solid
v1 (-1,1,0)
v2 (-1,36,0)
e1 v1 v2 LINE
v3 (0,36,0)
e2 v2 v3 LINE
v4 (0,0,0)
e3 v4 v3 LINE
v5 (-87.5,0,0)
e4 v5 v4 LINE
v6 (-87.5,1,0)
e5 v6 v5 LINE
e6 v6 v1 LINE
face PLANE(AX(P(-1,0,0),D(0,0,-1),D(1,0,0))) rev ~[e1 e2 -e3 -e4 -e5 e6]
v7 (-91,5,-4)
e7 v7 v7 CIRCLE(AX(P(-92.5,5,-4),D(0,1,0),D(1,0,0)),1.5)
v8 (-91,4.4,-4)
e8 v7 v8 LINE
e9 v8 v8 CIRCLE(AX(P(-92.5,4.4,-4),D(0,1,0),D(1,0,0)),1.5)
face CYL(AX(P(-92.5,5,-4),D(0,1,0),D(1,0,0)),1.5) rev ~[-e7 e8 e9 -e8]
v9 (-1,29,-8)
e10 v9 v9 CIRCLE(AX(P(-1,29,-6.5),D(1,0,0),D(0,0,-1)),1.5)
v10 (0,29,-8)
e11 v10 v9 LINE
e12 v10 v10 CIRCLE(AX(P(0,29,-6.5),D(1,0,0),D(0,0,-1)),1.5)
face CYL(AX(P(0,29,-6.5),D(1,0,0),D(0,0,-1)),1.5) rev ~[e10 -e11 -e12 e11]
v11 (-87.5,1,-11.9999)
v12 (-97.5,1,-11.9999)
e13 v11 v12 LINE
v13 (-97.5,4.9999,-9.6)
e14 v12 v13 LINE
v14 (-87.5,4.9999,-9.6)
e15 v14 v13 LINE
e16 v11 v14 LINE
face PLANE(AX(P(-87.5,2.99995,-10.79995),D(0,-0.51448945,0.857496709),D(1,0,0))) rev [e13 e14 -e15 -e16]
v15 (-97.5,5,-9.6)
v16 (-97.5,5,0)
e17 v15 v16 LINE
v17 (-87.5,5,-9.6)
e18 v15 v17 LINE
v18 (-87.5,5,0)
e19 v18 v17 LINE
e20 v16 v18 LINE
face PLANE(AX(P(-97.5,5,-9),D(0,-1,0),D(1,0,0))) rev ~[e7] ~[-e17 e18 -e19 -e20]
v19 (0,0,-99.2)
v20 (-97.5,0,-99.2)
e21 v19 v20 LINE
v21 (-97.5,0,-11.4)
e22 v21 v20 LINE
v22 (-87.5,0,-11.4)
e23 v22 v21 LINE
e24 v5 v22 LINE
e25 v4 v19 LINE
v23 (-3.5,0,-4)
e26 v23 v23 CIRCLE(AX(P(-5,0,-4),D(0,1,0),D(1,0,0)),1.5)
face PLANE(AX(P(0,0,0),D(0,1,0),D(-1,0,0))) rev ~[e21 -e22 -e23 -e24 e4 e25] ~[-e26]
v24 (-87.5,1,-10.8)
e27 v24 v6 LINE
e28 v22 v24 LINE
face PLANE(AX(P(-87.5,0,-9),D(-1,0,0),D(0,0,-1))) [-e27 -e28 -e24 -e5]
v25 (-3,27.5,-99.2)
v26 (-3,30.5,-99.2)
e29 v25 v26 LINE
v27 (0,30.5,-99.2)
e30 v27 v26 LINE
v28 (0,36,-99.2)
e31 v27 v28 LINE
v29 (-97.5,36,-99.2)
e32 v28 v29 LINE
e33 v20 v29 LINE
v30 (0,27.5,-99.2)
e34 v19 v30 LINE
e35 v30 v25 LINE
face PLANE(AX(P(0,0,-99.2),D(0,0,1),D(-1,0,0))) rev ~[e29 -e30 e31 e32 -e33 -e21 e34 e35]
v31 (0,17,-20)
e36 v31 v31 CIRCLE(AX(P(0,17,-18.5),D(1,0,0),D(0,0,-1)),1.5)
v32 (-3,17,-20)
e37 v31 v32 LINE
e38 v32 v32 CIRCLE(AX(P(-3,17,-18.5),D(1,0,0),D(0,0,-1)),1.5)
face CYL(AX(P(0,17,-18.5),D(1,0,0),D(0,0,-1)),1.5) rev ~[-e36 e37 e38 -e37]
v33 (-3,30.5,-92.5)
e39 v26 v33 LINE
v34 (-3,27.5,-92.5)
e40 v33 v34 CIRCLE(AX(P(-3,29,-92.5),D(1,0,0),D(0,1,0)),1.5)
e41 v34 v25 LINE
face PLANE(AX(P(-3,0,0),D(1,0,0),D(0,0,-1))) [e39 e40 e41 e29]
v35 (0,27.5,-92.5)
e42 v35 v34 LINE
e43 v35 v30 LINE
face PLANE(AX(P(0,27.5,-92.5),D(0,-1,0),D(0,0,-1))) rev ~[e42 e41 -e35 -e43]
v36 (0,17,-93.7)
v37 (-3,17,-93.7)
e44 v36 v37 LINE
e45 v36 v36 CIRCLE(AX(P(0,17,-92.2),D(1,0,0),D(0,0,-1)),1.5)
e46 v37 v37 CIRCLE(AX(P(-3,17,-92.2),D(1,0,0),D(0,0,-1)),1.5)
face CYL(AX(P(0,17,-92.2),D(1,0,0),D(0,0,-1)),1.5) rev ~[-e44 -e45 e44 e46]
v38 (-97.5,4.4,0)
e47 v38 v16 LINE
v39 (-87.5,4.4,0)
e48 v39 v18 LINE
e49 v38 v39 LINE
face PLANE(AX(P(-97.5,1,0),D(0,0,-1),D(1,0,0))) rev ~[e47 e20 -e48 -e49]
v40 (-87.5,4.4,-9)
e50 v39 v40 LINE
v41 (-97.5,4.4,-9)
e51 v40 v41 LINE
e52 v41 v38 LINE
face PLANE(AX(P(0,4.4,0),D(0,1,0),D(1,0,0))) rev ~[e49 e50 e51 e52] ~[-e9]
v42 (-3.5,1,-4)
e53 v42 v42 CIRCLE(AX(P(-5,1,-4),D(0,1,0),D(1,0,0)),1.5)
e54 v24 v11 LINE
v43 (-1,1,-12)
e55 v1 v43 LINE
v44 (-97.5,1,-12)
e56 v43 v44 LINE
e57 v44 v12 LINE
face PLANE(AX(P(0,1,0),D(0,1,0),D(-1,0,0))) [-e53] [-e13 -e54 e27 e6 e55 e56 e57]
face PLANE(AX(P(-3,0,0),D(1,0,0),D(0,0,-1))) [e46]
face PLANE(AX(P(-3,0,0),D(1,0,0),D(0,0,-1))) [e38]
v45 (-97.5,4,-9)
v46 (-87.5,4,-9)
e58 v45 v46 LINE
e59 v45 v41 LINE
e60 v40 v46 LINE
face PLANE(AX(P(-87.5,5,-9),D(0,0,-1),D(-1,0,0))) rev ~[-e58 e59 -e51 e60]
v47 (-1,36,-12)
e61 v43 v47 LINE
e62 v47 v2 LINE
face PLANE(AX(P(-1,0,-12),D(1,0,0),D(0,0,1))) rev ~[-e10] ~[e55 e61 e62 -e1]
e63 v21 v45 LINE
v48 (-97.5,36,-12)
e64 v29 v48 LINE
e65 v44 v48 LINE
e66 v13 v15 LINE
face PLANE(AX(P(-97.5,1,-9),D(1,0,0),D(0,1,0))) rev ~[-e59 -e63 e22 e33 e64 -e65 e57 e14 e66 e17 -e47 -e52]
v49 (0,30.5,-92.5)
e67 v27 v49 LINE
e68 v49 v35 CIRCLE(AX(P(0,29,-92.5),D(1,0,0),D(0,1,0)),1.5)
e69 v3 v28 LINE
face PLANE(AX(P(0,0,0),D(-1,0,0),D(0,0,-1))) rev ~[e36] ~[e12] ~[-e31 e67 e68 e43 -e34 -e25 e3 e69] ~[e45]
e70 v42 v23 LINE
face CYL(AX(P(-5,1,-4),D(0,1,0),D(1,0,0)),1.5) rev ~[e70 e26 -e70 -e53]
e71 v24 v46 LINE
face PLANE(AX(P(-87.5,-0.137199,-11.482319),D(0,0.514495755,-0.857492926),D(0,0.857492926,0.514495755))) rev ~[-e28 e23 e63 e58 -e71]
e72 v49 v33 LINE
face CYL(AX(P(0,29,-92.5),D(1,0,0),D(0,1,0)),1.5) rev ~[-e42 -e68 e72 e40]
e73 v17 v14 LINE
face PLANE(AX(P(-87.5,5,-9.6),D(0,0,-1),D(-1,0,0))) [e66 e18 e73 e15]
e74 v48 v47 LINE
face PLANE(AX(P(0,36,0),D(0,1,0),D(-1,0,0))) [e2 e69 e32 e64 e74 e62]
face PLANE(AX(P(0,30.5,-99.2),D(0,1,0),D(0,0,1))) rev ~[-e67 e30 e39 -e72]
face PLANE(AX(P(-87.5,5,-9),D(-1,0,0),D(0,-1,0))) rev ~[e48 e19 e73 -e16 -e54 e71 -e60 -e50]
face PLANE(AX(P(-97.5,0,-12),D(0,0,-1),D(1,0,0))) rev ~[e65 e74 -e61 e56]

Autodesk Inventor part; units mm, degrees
ref_plane "YZ Plane" through (0, 0, 0) normal (1, 0, 0) x (0, 1, 0)
ref_plane "XZ Plane" through (0, 0, 0) normal (0, 1, 0) x (-1, 0, 0)
ref_plane "XY Plane" through (0, 0, 0) normal (0, 0, 1) x (1, 0, 0)
sketch "스케치1" plane through (0, 0, 0) normal (0, 1, 0) x (-1, 0, 0)
  line L0 (0, 0) -> (97.5, 0)
  line L1 (97.5, 0) -> (97.5, -99.2)
  line L2 (97.5, -99.2) -> (0, -99.2)
  line L3 (0, -99.2) -> (0, 0)
  line L4 (97.5, 0) -> (1, 0)
  line L5 (1, 0) -> (1, -12)
  line L6 (1, -12) -> (97.5, -12)
  line L7 (97.5, -12) -> (97.5, 0)
  point P0 (1, -6)
  point P1 (97.5, -6)
  point P2 (48.75, 0)
  dimension "d0" = 97.5
  dimension "d1" = 99.2
  dimension "d2" = 96.5
  dimension "d3" = 12
  dimension "d6" = 1
sketch "스케치1 outline for 돌출1" plane through (0, 0, 0) normal (0, 1, 0) x (-1, 0, 0)
  line L0 (0, 0) -> (0, -99.2)
  line L1 (1, 0) -> (0, 0)
  line L2 (1, -12) -> (1, 0)
  line L3 (97.5, -12) -> (1, -12)
  line L4 (97.5, -99.2) -> (97.5, -12)
  line L5 (0, -99.2) -> (97.5, -99.2)
extrude "돌출1" add sketch "스케치1 outline for 돌출1" along normal blind 36
sketch "스케치1 outline for 돌출2" plane through (0, 0, 0) normal (0, 1, 0) x (-1, 0, 0)
  line L0 (1, -12) -> (97.5, -12)
  line L1 (1, 0) -> (1, -12)
  line L2 (97.5, 0) -> (1, 0)
  line L3 (97.5, -12) -> (97.5, 0)
extrude "돌출2" add sketch "스케치1 outline for 돌출2" along normal blind 1
sketch "스케치2" plane through (0, 1, 0) normal (0, 1, 0) x (1, 0, 0)
  circle A0 centre (-5, 4) radius 1.5
  line L0 (0, 0) -> (0, 99.2) projected
  line L1 (-97.5, 0) -> (-1, 0) projected
  line L2 (-97.5, 0) -> (0, 0) projected
  line L3 (-97.5, 0) -> (-87.5, 0)
  line L4 (-87.5, 0) -> (-87.5, 9)
  line L5 (-87.5, 9) -> (-97.5, 9)
  line L6 (-97.5, 9) -> (-97.5, 0)
  dimension "d11" = 3
  dimension "d13" = 5
  dimension "d14" = 4
  dimension "d15" = 10
  dimension "d16" = 9
sketch "스케치2 outline for 돌출3" plane through (0, 1, 0) normal (0, 1, 0) x (1, 0, 0)
  line L0 (-97.5, 9) -> (-97.5, 0)
  line L1 (-87.5, 9) -> (-97.5, 9)
  line L2 (-87.5, 0) -> (-87.5, 9)
  line L3 (-97.5, 0) -> (-87.5, 0)
extrude "돌출3" cut sketch "스케치2 outline for 돌출3" against normal blind 1
sketch "스케치2 outline for 돌출4" plane through (0, 1, 0) normal (0, 1, 0) x (1, 0, 0)
  line L0 (-97.5, 9) -> (-97.5, 0)
  line L1 (-87.5, 9) -> (-97.5, 9)
  line L2 (-87.5, 0) -> (-87.5, 9)
  line L3 (-97.5, 0) -> (-87.5, 0)
extrude "돌출4" add sketch "스케치2 outline for 돌출4" along normal blind 4
sketch "스케치2 outline for 돌출5" plane through (0, 1, 0) normal (0, 1, 0) x (1, 0, 0)
  line L0 (-97.5, 9) -> (-97.5, 0)
  line L1 (-87.5, 9) -> (-97.5, 9)
  line L2 (-87.5, 0) -> (-87.5, 9)
  line L3 (-97.5, 0) -> (-87.5, 0)
extrude "돌출5" cut sketch "스케치2 outline for 돌출5" along normal blind 3.4
sketch "스케치3" plane through (-87.5, 5, -9) normal (0, 0, -1) x (-1, 0, 0)
  line L0 (0, 0) -> (10, 0)
  line L1 (10, 0) -> (10, -4)
  line L2 (10, -4) -> (0, -4)
  line L3 (0, -4) -> (0, 0)
  point P0 (-87.5, -5)
  point P1 (0, -0.6)
sketch "스케치3 outline for 돌출6" plane through (-87.5, 5, -9) normal (0, 0, -1) x (-1, 0, 0)
  line L0 (0, 0) -> (0, -4)
  line L1 (10, 0) -> (0, 0)
  line L2 (10, -4) -> (10, 0)
  line L3 (0, -4) -> (10, -4)
extrude "돌출6" add sketch "스케치3 outline for 돌출6" along normal blind 0.6
chamfer "모따기1" distance 2.4 distance2 4 1 edges at (-92.5, 1, -9.6) measured on face at (-29.8333, 1, -7)
chamfer "모따기2" distance 2.4 distance2 4 1 edges at (-92.5, 0, -9)
sketch "스케치4" plane through (0, 5, 0) normal (0, 1, 0) x (1, 0, 0)
  circle A0 centre (-92.5, 4) radius 1.5
  line L0 (-97.5, 0) -> (-97.5, 9.6) projected
  line L1 (-97.5, 0) -> (-87.5, 0) projected
  point P0 (0, 0)
  point P1 (-97.5, 4.8)
  dimension "d31" = 3
  dimension "d32" = 5
  dimension "d33" = 4
sketch "스케치2 outline for 돌출7" plane through (0, 1, 0) normal (0, 1, 0) x (1, 0, 0)
  circle A0 centre (-5, 4) radius 1.5
extrude "돌출7" cut sketch "스케치2 outline for 돌출7" against normal blind 3.1
sketch "스케치4 outline for 돌출8" plane through (0, 5, 0) normal (0, 1, 0) x (1, 0, 0)
  circle A0 centre (-92.5, 4) radius 1.5
extrude "돌출8" cut sketch "스케치4 outline for 돌출8" against normal blind 3.1
sketch "스케치5" plane through (0, 0, 0) normal (1, 0, 0) x (0, 0, -1)
  circle A0 centre (18.5, 17) radius 1.5
  circle A1 centre (92.2, 17) radius 1.5
  line L0 (0, 0) -> (99.2, 0) projected
  line L1 (99.2, 0) -> (99.2, 36) projected
  circle A2 centre (6.5, 29) radius 1.5
  circle A3 centre (92.5, 29) radius 1.5
  line L2 (0, 36) -> (99.2, 36) projected
  line L3 (0, 0) -> (0, 36) projected
  line L4 (92.5, 30.5) -> (99.2, 30.5)
  line L5 (99.2, 30.5) -> (99.2, 27.5)
  line L6 (99.2, 27.5) -> (92.5, 27.5)
  line L7 (92.5, 27.5) -> (92.5, 30.5)
  dimension "d44" = 3
  dimension "d38" = 3
  dimension "d39" = 3
  dimension "d40" = 17
  dimension "d41" = 73.7
  dimension "d42" = 7
  dimension "d43" = 3
  dimension "d45" = 7
  dimension "d46" = 6.5
  dimension "d48" = 86
sketch "스케치5 outline for 돌출9" plane through (0, 0, 0) normal (1, 0, 0) x (0, 0, -1)
  circle A0 centre (6.5, 29) radius 1.5
  circle A1 centre (18.5, 17) radius 1.5
  line L0 (92.5, 27.5) -> (99.2, 27.5)
  arc A2 (92.5, 30.5) -> (92.5, 27.5) centre (92.5, 29) ccw
  line L1 (99.2, 30.5) -> (92.5, 30.5)
  line L2 (99.2, 27.5) -> (99.2, 30.5)
  circle A3 centre (92.2, 17) radius 1.5
extrude "돌출9" cut sketch "스케치5 outline for 돌출9" against normal blind 3
properties part number "smps"
